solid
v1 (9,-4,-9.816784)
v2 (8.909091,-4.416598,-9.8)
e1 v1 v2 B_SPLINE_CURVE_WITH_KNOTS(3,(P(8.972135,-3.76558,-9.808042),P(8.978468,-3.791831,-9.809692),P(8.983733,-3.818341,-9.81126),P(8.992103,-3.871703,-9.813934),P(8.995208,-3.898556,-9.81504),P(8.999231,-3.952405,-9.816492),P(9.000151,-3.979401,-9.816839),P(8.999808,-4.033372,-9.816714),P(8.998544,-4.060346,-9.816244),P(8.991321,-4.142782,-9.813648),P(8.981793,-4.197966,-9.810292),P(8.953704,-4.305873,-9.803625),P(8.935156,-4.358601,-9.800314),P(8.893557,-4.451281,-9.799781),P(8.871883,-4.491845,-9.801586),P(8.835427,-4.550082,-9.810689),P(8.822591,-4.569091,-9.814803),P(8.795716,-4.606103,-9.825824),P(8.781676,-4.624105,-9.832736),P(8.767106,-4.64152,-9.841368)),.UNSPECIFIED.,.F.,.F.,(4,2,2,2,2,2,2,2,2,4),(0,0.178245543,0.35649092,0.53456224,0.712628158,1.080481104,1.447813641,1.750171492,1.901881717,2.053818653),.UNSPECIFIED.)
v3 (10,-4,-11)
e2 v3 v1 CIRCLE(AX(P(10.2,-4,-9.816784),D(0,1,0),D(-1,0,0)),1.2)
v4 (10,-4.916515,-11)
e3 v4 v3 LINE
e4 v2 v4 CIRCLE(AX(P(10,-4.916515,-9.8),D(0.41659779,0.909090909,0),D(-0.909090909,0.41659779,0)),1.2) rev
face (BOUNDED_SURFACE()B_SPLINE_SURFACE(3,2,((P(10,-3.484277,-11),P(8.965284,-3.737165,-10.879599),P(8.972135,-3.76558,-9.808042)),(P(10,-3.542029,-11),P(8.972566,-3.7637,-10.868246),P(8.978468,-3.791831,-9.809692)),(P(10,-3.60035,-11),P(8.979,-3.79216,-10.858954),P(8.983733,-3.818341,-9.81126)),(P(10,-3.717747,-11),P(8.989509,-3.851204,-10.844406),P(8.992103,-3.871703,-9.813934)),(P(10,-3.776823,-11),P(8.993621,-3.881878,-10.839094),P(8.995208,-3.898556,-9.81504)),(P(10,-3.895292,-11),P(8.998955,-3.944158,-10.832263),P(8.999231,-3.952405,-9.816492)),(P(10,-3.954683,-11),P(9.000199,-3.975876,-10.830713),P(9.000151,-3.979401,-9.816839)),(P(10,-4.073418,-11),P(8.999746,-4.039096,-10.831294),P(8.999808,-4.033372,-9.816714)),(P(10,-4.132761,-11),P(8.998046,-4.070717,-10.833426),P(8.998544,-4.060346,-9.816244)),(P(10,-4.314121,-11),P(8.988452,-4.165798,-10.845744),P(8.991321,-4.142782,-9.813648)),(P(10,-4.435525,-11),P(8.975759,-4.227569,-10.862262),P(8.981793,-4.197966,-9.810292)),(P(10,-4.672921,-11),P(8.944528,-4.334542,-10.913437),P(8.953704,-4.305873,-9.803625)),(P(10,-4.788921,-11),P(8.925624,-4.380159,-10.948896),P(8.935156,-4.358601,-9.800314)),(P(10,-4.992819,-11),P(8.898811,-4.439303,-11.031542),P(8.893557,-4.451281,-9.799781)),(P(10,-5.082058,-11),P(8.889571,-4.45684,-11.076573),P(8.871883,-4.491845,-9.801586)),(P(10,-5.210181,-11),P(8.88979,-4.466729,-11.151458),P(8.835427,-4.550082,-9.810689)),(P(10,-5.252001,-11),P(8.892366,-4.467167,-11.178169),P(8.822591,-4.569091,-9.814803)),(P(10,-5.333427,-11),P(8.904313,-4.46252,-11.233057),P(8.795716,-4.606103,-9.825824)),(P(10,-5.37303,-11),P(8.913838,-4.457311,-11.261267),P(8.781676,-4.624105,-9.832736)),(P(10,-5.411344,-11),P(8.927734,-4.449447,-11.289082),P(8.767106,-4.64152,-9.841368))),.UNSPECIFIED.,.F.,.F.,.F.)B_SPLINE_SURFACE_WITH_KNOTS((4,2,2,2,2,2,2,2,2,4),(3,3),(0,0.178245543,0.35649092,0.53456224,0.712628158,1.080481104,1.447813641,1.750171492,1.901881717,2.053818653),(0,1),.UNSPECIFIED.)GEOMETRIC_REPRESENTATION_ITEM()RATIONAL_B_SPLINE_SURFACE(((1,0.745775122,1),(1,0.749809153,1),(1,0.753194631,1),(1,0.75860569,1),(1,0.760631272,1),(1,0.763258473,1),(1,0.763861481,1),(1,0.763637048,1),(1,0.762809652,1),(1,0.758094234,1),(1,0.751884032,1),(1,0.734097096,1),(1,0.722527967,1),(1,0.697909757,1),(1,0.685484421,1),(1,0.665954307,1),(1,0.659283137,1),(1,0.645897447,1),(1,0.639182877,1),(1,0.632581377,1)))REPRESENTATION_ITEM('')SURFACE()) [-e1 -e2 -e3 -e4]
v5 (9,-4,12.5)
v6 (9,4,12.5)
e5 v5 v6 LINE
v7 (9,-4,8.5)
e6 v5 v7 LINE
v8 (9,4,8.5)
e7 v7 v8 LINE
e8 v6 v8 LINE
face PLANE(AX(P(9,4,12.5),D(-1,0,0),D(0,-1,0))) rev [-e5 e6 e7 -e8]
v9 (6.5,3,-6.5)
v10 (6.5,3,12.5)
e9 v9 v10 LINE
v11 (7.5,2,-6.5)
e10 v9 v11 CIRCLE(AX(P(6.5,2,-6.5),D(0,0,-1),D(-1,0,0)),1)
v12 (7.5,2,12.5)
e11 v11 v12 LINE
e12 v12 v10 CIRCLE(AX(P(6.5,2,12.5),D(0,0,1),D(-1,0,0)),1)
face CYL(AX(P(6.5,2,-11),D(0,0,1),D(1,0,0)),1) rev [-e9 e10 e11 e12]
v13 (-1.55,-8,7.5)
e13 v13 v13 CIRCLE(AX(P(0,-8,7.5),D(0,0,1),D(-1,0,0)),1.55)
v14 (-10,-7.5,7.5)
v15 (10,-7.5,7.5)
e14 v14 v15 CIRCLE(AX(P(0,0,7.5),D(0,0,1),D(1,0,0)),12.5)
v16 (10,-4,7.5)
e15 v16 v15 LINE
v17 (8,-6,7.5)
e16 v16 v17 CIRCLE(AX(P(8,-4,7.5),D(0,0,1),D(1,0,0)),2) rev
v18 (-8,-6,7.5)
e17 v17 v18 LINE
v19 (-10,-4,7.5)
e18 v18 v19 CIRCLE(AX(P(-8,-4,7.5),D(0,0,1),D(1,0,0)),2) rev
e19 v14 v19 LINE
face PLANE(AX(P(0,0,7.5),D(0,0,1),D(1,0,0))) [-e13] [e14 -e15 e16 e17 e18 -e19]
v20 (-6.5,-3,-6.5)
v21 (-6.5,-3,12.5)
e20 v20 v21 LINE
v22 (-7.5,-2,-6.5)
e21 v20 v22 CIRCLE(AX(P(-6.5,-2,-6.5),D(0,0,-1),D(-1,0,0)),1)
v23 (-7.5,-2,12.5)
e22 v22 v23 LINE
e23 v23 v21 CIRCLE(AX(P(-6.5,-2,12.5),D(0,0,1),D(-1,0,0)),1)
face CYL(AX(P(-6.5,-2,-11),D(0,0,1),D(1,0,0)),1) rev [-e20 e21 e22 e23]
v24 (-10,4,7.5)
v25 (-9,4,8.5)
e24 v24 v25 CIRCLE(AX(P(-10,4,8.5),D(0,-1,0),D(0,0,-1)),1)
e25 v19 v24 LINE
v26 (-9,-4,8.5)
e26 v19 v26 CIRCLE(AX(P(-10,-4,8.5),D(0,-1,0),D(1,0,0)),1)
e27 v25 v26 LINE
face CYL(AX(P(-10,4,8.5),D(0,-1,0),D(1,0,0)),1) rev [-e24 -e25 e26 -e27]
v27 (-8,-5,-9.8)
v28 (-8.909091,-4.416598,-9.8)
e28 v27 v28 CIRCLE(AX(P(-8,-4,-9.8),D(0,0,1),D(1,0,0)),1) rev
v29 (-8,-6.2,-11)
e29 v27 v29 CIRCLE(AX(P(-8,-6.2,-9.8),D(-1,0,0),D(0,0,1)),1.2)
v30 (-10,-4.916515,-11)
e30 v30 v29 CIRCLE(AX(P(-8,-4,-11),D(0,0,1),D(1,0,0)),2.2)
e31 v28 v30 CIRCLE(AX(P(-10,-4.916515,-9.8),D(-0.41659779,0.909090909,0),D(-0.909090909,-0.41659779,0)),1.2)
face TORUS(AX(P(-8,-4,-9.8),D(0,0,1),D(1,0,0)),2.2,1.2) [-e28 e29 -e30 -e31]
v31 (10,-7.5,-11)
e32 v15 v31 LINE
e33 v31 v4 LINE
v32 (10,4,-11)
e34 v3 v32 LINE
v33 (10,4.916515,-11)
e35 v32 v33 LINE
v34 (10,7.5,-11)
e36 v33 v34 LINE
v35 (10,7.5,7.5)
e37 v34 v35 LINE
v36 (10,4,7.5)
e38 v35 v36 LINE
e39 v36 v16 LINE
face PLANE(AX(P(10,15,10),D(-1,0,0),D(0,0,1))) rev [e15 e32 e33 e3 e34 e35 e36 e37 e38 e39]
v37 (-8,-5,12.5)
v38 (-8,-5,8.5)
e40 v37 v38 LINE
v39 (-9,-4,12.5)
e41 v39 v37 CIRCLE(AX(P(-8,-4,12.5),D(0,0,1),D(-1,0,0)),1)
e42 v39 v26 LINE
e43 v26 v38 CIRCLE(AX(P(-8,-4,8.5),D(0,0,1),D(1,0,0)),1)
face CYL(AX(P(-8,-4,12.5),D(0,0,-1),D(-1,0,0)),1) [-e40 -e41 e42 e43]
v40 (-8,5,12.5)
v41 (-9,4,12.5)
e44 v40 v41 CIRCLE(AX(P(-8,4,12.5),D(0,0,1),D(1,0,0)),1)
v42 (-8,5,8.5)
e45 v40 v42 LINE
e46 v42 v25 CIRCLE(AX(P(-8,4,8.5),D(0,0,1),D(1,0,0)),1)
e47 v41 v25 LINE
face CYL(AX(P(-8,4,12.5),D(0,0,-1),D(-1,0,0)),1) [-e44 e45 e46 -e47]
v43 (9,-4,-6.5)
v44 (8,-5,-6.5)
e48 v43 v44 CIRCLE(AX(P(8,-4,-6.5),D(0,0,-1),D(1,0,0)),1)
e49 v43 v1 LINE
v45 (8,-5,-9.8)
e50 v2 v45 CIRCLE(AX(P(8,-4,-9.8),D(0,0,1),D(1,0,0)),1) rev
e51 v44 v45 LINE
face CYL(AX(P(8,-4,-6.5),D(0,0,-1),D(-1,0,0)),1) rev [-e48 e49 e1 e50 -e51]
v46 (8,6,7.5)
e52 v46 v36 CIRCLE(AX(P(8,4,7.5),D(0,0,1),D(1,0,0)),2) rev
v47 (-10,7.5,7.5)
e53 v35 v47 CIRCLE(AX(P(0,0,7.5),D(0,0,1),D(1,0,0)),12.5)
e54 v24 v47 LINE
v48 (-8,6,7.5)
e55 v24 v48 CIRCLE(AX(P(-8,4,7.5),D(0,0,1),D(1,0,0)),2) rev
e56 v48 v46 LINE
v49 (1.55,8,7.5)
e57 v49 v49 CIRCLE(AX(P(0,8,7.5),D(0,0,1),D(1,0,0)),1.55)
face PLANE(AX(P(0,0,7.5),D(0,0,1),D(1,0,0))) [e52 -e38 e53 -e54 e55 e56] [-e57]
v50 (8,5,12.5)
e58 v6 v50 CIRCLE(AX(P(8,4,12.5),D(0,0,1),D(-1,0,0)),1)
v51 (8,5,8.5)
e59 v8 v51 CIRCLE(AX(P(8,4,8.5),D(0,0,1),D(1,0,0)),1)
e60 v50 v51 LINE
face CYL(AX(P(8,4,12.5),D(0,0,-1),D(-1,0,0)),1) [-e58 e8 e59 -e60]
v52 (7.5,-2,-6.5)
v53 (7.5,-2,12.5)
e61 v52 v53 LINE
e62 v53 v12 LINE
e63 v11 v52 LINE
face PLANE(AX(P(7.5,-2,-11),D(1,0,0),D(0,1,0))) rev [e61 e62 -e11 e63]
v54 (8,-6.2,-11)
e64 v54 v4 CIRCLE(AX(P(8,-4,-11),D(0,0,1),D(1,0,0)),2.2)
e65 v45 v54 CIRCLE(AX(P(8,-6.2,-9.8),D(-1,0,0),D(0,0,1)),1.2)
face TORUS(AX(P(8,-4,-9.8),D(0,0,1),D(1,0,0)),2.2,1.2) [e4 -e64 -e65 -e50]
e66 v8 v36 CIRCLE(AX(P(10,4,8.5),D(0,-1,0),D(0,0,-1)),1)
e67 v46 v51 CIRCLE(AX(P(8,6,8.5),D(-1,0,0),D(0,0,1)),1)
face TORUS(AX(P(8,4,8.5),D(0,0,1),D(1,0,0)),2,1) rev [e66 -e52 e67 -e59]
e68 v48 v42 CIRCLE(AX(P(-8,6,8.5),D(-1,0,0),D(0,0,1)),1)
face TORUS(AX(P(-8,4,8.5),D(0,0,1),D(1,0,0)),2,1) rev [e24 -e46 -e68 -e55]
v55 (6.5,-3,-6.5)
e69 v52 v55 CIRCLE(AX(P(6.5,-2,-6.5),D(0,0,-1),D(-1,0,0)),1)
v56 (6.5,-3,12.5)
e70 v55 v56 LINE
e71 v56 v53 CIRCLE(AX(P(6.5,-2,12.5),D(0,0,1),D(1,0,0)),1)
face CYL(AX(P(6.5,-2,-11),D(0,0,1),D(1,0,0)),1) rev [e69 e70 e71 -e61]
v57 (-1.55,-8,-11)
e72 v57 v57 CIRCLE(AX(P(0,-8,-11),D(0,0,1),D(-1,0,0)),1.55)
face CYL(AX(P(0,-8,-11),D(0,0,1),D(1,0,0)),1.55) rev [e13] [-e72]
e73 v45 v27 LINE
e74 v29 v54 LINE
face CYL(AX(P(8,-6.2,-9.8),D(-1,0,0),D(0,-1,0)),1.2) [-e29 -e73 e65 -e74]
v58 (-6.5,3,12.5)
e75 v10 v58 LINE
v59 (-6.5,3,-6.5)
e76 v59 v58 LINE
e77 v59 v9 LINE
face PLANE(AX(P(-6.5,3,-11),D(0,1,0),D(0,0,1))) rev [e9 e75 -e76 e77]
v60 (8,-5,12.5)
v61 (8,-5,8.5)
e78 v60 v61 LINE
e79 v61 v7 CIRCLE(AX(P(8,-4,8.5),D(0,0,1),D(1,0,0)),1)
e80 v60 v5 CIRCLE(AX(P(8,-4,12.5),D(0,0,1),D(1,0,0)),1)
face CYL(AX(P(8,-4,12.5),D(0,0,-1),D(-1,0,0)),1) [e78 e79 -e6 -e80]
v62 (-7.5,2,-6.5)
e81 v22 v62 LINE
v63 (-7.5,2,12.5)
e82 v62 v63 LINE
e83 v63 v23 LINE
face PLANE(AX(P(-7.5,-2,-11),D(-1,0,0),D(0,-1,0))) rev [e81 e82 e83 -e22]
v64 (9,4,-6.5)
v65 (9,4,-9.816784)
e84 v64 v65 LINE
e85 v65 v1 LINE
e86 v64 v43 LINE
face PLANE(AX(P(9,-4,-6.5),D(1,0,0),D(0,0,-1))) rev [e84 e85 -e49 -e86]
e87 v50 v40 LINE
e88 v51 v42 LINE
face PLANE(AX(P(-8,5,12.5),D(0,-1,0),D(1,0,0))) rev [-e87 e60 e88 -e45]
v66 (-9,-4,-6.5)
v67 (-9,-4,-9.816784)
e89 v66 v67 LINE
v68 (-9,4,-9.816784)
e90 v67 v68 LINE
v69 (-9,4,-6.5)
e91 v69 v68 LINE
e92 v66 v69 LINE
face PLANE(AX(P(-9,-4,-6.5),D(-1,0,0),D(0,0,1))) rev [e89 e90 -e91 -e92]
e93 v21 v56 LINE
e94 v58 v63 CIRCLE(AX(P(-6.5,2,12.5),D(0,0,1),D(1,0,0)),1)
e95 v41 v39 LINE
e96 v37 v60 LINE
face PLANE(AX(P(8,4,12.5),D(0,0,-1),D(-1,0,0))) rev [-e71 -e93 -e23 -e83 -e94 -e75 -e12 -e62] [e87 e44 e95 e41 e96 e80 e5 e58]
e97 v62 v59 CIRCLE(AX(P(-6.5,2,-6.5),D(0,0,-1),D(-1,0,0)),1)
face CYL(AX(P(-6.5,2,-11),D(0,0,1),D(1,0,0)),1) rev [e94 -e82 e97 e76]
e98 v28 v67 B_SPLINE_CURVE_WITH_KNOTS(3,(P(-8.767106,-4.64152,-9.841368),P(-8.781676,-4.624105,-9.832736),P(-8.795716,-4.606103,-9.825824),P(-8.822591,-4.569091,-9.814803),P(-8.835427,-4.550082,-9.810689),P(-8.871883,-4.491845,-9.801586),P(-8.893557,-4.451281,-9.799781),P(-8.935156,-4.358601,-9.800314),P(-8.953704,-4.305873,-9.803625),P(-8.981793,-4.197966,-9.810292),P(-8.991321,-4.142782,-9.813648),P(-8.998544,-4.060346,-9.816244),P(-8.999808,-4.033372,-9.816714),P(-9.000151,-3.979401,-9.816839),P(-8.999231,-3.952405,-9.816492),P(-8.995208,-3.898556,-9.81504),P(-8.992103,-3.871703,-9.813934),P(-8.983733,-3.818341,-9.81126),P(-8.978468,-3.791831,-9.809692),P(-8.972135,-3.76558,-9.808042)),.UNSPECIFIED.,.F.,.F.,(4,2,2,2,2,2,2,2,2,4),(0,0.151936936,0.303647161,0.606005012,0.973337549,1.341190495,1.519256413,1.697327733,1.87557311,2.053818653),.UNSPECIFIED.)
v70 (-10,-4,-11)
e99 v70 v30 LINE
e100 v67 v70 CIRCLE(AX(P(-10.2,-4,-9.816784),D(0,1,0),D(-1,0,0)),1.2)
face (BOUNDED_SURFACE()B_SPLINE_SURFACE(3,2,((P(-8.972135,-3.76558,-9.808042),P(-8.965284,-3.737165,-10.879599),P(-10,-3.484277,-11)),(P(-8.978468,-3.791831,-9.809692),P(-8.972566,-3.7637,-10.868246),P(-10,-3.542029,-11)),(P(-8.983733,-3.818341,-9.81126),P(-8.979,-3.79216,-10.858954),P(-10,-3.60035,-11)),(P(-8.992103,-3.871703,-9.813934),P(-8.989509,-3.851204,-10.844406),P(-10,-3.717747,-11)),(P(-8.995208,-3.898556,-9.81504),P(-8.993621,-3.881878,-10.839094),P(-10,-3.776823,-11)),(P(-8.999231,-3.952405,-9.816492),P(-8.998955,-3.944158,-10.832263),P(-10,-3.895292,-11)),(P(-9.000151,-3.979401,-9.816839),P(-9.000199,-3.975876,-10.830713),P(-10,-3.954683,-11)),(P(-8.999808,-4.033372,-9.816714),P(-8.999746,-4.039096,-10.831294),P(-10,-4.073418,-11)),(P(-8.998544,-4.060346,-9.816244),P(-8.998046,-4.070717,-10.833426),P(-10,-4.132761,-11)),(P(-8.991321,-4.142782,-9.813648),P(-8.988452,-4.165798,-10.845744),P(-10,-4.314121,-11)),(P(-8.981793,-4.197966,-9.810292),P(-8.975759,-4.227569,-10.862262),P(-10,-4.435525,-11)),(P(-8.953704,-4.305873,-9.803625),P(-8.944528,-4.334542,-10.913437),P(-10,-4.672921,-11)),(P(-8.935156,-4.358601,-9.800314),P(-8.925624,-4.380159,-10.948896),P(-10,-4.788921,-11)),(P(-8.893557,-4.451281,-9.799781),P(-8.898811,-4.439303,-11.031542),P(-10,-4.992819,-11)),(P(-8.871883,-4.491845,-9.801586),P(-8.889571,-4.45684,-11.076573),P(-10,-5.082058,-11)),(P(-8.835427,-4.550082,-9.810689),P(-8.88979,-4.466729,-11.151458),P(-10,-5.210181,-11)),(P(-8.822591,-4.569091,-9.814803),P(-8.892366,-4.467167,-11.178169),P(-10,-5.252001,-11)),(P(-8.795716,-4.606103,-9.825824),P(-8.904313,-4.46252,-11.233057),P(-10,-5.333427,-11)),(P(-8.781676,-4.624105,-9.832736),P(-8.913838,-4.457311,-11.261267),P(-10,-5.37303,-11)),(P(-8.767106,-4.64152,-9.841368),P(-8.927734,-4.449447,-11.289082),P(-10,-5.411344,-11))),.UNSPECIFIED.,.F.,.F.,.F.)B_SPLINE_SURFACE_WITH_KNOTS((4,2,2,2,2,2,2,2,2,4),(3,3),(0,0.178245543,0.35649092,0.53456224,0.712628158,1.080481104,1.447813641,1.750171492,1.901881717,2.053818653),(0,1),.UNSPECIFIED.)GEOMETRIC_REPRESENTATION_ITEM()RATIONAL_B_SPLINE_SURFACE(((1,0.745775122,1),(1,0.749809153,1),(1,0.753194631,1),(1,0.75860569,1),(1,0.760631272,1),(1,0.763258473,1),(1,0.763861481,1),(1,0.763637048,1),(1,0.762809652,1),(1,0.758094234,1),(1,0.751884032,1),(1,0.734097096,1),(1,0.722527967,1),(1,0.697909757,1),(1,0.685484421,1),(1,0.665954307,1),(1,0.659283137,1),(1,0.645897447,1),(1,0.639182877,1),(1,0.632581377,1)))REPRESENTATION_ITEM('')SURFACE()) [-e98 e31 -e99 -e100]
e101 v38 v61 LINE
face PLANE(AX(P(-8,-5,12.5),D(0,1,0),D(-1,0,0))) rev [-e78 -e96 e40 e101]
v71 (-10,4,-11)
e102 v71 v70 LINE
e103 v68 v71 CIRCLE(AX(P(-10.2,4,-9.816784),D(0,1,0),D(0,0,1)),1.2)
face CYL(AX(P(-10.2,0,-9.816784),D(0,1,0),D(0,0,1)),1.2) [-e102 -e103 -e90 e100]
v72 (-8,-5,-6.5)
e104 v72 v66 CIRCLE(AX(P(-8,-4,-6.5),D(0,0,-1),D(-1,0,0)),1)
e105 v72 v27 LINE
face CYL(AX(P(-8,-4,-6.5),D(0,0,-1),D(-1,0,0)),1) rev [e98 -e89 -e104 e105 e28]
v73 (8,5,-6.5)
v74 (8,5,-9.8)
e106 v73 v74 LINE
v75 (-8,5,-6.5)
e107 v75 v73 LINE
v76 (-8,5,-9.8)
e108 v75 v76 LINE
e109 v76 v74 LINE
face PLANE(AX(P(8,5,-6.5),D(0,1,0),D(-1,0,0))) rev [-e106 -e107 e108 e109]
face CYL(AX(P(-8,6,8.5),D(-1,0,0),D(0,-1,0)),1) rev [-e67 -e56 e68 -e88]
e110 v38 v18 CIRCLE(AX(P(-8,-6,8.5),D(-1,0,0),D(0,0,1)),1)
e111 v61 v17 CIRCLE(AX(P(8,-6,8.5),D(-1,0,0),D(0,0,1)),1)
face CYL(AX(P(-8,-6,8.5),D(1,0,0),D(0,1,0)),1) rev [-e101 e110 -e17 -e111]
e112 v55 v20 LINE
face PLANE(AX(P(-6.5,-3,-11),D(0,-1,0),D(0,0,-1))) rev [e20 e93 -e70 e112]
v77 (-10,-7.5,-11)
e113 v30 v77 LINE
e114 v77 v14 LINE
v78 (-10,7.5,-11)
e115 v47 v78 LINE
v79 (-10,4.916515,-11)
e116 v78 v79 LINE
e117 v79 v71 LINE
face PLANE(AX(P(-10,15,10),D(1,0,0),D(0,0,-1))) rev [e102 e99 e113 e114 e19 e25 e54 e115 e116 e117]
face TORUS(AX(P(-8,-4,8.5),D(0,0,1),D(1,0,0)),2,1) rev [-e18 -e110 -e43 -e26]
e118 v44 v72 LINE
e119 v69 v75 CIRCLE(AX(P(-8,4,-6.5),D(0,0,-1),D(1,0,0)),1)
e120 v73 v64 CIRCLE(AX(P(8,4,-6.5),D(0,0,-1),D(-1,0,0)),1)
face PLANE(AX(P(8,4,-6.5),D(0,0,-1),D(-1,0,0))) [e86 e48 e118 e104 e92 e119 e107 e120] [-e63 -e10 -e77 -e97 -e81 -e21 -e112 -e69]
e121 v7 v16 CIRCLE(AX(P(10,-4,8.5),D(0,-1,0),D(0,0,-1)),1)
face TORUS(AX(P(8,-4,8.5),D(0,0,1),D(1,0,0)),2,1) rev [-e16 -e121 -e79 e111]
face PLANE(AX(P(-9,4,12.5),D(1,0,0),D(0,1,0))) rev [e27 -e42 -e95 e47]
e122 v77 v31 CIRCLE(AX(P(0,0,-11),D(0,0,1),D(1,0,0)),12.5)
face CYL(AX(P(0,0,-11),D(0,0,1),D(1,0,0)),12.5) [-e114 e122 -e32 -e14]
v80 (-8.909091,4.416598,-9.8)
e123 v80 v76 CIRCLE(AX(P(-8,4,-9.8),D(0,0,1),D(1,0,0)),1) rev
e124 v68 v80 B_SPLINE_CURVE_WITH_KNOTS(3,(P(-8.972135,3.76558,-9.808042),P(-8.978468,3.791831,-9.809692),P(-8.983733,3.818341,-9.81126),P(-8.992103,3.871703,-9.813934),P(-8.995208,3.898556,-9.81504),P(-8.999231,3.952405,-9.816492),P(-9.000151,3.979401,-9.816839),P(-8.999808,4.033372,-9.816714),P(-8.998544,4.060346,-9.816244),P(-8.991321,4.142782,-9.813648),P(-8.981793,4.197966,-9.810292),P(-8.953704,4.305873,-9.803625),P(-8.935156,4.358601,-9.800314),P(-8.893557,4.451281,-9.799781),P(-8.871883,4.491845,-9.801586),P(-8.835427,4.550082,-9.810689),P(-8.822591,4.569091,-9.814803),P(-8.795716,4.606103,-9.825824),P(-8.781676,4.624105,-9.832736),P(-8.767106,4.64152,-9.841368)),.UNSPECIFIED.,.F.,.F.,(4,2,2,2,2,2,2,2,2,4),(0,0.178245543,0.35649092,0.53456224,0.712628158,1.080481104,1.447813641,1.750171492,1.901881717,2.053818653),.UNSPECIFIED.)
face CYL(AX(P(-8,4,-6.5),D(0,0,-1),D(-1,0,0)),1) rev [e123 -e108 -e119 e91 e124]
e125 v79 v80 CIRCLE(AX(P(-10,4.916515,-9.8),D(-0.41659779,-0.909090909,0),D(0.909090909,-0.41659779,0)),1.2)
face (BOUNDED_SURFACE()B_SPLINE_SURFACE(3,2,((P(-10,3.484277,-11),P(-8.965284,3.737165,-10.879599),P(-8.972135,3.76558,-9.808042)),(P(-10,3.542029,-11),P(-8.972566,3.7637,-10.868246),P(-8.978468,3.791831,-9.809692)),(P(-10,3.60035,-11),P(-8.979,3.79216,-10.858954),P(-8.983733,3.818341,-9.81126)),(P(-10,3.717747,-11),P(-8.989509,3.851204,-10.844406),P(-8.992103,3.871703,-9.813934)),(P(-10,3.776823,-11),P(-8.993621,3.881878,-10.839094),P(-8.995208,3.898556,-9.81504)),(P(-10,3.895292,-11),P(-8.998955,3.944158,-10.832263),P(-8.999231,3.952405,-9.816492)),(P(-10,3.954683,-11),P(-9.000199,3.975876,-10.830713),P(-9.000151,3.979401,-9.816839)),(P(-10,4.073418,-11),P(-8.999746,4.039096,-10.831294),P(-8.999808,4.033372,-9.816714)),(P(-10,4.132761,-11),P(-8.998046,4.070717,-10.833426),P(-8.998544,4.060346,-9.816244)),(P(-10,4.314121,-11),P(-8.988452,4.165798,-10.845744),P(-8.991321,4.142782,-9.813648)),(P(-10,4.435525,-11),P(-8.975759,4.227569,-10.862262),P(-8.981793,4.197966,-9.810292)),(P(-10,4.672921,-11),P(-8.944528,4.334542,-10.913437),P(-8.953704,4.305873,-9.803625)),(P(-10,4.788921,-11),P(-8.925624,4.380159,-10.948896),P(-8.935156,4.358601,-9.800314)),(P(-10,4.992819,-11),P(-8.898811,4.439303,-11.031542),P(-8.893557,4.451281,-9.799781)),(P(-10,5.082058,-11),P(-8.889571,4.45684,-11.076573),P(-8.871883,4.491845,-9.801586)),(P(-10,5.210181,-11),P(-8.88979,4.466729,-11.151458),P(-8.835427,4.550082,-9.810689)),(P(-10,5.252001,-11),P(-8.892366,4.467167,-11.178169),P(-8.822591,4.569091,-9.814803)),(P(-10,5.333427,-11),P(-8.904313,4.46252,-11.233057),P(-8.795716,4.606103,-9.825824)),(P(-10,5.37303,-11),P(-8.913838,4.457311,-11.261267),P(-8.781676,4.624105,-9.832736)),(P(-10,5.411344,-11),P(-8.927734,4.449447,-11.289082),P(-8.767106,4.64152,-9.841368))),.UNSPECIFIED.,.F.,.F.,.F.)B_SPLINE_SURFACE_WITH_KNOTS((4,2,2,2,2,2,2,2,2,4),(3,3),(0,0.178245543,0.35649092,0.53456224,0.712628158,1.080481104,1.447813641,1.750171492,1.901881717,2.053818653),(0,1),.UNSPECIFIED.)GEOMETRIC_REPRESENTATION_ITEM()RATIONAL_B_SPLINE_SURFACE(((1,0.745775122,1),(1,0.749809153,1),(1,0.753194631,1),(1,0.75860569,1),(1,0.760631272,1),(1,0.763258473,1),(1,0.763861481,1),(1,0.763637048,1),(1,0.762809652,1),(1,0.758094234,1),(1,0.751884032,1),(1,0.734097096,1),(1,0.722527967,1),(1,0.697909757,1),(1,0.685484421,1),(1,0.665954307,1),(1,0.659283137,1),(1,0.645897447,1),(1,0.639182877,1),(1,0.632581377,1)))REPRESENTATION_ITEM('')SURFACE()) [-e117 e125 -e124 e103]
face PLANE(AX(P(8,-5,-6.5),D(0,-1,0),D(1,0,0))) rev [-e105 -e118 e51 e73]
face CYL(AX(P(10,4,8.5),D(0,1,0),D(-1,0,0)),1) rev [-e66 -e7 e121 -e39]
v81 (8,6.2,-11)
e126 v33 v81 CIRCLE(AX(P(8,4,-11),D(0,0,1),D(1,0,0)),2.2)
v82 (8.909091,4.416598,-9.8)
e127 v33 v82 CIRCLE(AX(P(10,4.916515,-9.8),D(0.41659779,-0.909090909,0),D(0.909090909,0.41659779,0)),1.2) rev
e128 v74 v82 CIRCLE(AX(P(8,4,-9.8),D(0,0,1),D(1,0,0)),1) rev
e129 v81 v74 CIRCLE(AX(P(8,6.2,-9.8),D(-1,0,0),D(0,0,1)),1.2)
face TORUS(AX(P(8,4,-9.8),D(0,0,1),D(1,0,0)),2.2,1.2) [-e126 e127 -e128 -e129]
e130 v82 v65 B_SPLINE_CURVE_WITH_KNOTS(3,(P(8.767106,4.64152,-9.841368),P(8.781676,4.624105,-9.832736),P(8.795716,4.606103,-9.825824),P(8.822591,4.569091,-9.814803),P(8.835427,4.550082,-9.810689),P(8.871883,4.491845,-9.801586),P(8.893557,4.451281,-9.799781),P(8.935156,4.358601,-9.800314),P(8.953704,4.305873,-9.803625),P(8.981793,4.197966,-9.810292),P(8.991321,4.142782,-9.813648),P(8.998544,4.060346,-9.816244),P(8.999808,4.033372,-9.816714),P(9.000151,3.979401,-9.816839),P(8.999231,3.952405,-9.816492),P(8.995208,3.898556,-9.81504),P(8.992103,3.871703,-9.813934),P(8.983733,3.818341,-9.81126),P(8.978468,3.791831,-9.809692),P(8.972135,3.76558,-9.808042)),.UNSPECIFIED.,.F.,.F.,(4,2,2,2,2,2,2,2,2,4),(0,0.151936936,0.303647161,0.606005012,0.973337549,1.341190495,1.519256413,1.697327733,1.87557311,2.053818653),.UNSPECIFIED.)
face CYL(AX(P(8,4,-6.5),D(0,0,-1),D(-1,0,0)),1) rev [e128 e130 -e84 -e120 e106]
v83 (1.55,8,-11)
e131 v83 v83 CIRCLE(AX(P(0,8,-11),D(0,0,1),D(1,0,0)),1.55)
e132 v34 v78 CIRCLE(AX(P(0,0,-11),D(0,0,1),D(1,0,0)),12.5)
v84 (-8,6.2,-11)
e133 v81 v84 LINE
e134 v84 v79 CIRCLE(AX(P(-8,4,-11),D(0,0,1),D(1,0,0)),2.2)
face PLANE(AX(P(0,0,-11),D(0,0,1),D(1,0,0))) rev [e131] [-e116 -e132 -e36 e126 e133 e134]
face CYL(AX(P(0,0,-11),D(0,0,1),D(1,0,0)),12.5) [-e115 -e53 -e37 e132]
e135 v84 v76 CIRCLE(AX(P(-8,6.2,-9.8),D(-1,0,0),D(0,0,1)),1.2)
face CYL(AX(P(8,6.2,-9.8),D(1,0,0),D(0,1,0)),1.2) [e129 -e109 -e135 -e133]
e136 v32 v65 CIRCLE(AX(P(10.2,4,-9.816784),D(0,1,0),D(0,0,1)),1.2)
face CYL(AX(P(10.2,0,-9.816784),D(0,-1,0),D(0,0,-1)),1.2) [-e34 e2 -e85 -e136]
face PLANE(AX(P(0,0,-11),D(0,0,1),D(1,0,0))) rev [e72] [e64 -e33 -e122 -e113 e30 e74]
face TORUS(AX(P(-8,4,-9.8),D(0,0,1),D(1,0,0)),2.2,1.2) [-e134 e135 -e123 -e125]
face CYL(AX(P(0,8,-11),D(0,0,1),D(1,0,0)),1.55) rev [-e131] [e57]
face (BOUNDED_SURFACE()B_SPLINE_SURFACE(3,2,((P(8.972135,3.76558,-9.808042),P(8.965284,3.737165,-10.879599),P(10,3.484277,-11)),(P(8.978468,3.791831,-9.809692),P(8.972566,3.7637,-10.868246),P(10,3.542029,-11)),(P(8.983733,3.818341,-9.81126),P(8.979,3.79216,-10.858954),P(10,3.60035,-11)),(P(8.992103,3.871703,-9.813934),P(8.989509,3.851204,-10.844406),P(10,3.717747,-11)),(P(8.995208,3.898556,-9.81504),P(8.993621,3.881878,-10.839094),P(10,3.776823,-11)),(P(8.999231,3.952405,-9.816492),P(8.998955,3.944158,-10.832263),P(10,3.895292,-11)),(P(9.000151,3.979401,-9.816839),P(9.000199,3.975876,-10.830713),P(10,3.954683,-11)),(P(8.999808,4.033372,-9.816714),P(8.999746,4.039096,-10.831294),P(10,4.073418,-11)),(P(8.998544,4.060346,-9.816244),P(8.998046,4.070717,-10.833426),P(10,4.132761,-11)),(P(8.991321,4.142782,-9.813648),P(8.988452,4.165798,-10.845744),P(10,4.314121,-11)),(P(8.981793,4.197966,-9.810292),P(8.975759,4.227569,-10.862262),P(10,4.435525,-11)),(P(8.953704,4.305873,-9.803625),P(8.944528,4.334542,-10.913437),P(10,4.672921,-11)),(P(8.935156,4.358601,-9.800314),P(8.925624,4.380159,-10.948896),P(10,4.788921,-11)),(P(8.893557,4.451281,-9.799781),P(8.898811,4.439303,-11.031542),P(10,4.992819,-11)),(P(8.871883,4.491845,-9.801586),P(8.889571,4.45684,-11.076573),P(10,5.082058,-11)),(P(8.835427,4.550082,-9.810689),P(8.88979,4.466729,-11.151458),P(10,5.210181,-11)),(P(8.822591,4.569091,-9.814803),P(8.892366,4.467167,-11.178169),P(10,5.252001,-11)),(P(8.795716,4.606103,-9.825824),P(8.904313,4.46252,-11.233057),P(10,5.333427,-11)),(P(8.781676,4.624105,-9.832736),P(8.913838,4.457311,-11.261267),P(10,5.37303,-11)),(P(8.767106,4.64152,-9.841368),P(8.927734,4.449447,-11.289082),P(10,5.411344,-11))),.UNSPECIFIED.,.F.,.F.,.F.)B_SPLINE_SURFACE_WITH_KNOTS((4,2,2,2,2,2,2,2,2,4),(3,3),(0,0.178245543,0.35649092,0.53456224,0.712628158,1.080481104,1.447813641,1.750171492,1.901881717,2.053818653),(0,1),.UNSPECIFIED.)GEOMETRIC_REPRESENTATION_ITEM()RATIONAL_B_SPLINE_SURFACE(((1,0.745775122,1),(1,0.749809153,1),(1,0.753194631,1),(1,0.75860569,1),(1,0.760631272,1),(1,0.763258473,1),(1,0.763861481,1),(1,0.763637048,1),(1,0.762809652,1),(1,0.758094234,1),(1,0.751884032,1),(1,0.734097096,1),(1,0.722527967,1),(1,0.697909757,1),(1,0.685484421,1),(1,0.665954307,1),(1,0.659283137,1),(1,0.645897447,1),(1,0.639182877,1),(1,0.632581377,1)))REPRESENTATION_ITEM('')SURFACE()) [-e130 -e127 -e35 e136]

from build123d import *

# Parameters (mm, degrees)
AUFSATZ_LINEAR_AUSTRAGEN1_DEPTH      = 7.5
AUFSATZ_LINEAR_AUSTRAGEN1_DEPTH_BACK = 11
SKIZZE1_R                            = 12.5
SKIZZE1_R_2                          = 1.55
SCHNITT_LINEAR_AUSTRAGEN1_DEPTH      = 4.5
AUFSATZ_LINEAR_AUSTRAGEN2_DEPTH      = 5
SCHNITT_LINEAR_AUSTRAGEN4_DEPTH      = 22.650635095
SCHNITT_LINEAR_AUSTRAGEN4_DEPTH_BACK = 22.650635095
SCHNITT_LINEAR_AUSTRAGEN5_DEPTH      = 10
SCHNITT_LINEAR_AUSTRAGEN5_DEPTH_BACK = 22.650635095
SKIZZE5_OUTSIDE_W                    = 35.49
SKIZZE5_OUTSIDE_H                    = 35.49
SKIZZE5_OUTSIDE_W_2                  = 20
SKIZZE5_OUTSIDE_H_2                  = 30
VERRUNDUNG1_R                        = 1.2
VERRUNDUNG2_R                        = 1


with BuildPart() as part:
    # Skizze1 → Aufsatz-Linear austragen1 (new, two sides: drawn at the far end of the back side and taken through both)
    with BuildSketch(Plane.XY.offset(-AUFSATZ_LINEAR_AUSTRAGEN1_DEPTH_BACK)):
        Circle(SKIZZE1_R)
        with Locations((0, 8)):
            Circle(SKIZZE1_R_2, mode=Mode.SUBTRACT)
        with Locations(Location((0, -8, 0), (0, 0, 180))):
            Circle(SKIZZE1_R_2, mode=Mode.SUBTRACT)
    extrude(amount=AUFSATZ_LINEAR_AUSTRAGEN1_DEPTH + AUFSATZ_LINEAR_AUSTRAGEN1_DEPTH_BACK)

    # Skizze2 → Schnitt-Linear austragen1 (cut)
    with BuildSketch(Plane(origin=(0, 0, -11), x_dir=(-1, 0, 0), z_dir=(0, 0, -1))):
        with BuildLine():
            Line((-9, -4), (-9, 4))
            ThreePointArc((-9, 4), (-8.707106781, 4.707106781), (-8, 5))
            Line((-8, 5), (8, 5))
            ThreePointArc((8, 5), (8.707106781, 4.707106781), (9, 4))
            Line((9, 4), (9, -4))
            ThreePointArc((9, -4), (8.707106781, -4.707106781), (8, -5))
            Line((8, -5), (-8, -5))
            ThreePointArc((-8, -5), (-8.707106781, -4.707106781), (-9, -4))
        make_face()
    extrude(amount=-SCHNITT_LINEAR_AUSTRAGEN1_DEPTH, mode=Mode.SUBTRACT)

    # Skizze3 → Aufsatz-Linear austragen2 (add)
    with BuildSketch(Plane.XY.offset(7.5)):
        with BuildLine():
            Line((-8, 5), (8, 5))
            ThreePointArc((8, 5), (8.707106781, 4.707106781), (9, 4))
            Line((9, 4), (9, -4))
            ThreePointArc((9, -4), (8.707106781, -4.707106781), (8, -5))
            Line((8, -5), (-8, -5))
            ThreePointArc((-8, -5), (-8.707106781, -4.707106781), (-9, -4))
            Line((-9, -4), (-9, 4))
            ThreePointArc((-9, 4), (-8.707106781, 4.707106781), (-8, 5))
        make_face()
    extrude(amount=AUFSATZ_LINEAR_AUSTRAGEN2_DEPTH)

    # Skizze4 → Schnitt-Linear austragen4 (cut, two sides: drawn at the far end of the back side and taken through both)
    with BuildSketch(Plane.XY.offset(-SCHNITT_LINEAR_AUSTRAGEN4_DEPTH_BACK)):
        with BuildLine():
            Line((-6.5, -3), (6.5, -3))
            ThreePointArc((6.5, -3), (7.207106781, -2.707106781), (7.5, -2))
            Line((7.5, -2), (7.5, 2))
            ThreePointArc((7.5, 2), (7.207106781, 2.707106781), (6.5, 3))
            Line((6.5, 3), (-6.5, 3))
            ThreePointArc((-6.5, 3), (-7.207106781, 2.707106781), (-7.5, 2))
            Line((-7.5, 2), (-7.5, -2))
            ThreePointArc((-7.5, -2), (-7.207106781, -2.707106781), (-6.5, -3))
        make_face()
    extrude(amount=SCHNITT_LINEAR_AUSTRAGEN4_DEPTH + SCHNITT_LINEAR_AUSTRAGEN4_DEPTH_BACK, mode=Mode.SUBTRACT)

    # Skizze5 outside → Schnitt-Linear austragen5 (cut, two sides: drawn at the far end of the back side and taken through both)
    with BuildSketch(Plane.XY.offset(-SCHNITT_LINEAR_AUSTRAGEN5_DEPTH_BACK)):
        Rectangle(SKIZZE5_OUTSIDE_W, SKIZZE5_OUTSIDE_H)
        Rectangle(SKIZZE5_OUTSIDE_W_2, SKIZZE5_OUTSIDE_H_2, mode=Mode.SUBTRACT)
    extrude(amount=SCHNITT_LINEAR_AUSTRAGEN5_DEPTH + SCHNITT_LINEAR_AUSTRAGEN5_DEPTH_BACK, mode=Mode.SUBTRACT)

    # Verrundung1
    verrundung1_edges = [part.edges().sort_by_distance(p)[0] for p in [
        (-8.707106781, 4.707106781, -11),
        (-8.707106781, -4.707106781, -11),
        (0, -5, -11),
        (8.707106781, -4.707106781, -11),
        (8.707106781, 4.707106781, -11),
        (0, 5, -11),
    ]]
    fillet(verrundung1_edges, radius=VERRUNDUNG1_R)

    # Verrundung2
    verrundung2_edges = [part.edges().sort_by_distance(p)[0] for p in [
        (8.707106781, 4.707106781, 7.5),
        (0, 5, 7.5),
        (-8.707106781, 4.707106781, 7.5),
        (-9, 0, 7.5),
        (-8.707106781, -4.707106781, 7.5),
        (0, -5, 7.5),
        (8.707106781, -4.707106781, 7.5),
        (9, 0, 7.5),
    ]]
    fillet(verrundung2_edges, radius=VERRUNDUNG2_R - 0.0001)  # a hair under: the kernel refuses the full size


solid = part.part
